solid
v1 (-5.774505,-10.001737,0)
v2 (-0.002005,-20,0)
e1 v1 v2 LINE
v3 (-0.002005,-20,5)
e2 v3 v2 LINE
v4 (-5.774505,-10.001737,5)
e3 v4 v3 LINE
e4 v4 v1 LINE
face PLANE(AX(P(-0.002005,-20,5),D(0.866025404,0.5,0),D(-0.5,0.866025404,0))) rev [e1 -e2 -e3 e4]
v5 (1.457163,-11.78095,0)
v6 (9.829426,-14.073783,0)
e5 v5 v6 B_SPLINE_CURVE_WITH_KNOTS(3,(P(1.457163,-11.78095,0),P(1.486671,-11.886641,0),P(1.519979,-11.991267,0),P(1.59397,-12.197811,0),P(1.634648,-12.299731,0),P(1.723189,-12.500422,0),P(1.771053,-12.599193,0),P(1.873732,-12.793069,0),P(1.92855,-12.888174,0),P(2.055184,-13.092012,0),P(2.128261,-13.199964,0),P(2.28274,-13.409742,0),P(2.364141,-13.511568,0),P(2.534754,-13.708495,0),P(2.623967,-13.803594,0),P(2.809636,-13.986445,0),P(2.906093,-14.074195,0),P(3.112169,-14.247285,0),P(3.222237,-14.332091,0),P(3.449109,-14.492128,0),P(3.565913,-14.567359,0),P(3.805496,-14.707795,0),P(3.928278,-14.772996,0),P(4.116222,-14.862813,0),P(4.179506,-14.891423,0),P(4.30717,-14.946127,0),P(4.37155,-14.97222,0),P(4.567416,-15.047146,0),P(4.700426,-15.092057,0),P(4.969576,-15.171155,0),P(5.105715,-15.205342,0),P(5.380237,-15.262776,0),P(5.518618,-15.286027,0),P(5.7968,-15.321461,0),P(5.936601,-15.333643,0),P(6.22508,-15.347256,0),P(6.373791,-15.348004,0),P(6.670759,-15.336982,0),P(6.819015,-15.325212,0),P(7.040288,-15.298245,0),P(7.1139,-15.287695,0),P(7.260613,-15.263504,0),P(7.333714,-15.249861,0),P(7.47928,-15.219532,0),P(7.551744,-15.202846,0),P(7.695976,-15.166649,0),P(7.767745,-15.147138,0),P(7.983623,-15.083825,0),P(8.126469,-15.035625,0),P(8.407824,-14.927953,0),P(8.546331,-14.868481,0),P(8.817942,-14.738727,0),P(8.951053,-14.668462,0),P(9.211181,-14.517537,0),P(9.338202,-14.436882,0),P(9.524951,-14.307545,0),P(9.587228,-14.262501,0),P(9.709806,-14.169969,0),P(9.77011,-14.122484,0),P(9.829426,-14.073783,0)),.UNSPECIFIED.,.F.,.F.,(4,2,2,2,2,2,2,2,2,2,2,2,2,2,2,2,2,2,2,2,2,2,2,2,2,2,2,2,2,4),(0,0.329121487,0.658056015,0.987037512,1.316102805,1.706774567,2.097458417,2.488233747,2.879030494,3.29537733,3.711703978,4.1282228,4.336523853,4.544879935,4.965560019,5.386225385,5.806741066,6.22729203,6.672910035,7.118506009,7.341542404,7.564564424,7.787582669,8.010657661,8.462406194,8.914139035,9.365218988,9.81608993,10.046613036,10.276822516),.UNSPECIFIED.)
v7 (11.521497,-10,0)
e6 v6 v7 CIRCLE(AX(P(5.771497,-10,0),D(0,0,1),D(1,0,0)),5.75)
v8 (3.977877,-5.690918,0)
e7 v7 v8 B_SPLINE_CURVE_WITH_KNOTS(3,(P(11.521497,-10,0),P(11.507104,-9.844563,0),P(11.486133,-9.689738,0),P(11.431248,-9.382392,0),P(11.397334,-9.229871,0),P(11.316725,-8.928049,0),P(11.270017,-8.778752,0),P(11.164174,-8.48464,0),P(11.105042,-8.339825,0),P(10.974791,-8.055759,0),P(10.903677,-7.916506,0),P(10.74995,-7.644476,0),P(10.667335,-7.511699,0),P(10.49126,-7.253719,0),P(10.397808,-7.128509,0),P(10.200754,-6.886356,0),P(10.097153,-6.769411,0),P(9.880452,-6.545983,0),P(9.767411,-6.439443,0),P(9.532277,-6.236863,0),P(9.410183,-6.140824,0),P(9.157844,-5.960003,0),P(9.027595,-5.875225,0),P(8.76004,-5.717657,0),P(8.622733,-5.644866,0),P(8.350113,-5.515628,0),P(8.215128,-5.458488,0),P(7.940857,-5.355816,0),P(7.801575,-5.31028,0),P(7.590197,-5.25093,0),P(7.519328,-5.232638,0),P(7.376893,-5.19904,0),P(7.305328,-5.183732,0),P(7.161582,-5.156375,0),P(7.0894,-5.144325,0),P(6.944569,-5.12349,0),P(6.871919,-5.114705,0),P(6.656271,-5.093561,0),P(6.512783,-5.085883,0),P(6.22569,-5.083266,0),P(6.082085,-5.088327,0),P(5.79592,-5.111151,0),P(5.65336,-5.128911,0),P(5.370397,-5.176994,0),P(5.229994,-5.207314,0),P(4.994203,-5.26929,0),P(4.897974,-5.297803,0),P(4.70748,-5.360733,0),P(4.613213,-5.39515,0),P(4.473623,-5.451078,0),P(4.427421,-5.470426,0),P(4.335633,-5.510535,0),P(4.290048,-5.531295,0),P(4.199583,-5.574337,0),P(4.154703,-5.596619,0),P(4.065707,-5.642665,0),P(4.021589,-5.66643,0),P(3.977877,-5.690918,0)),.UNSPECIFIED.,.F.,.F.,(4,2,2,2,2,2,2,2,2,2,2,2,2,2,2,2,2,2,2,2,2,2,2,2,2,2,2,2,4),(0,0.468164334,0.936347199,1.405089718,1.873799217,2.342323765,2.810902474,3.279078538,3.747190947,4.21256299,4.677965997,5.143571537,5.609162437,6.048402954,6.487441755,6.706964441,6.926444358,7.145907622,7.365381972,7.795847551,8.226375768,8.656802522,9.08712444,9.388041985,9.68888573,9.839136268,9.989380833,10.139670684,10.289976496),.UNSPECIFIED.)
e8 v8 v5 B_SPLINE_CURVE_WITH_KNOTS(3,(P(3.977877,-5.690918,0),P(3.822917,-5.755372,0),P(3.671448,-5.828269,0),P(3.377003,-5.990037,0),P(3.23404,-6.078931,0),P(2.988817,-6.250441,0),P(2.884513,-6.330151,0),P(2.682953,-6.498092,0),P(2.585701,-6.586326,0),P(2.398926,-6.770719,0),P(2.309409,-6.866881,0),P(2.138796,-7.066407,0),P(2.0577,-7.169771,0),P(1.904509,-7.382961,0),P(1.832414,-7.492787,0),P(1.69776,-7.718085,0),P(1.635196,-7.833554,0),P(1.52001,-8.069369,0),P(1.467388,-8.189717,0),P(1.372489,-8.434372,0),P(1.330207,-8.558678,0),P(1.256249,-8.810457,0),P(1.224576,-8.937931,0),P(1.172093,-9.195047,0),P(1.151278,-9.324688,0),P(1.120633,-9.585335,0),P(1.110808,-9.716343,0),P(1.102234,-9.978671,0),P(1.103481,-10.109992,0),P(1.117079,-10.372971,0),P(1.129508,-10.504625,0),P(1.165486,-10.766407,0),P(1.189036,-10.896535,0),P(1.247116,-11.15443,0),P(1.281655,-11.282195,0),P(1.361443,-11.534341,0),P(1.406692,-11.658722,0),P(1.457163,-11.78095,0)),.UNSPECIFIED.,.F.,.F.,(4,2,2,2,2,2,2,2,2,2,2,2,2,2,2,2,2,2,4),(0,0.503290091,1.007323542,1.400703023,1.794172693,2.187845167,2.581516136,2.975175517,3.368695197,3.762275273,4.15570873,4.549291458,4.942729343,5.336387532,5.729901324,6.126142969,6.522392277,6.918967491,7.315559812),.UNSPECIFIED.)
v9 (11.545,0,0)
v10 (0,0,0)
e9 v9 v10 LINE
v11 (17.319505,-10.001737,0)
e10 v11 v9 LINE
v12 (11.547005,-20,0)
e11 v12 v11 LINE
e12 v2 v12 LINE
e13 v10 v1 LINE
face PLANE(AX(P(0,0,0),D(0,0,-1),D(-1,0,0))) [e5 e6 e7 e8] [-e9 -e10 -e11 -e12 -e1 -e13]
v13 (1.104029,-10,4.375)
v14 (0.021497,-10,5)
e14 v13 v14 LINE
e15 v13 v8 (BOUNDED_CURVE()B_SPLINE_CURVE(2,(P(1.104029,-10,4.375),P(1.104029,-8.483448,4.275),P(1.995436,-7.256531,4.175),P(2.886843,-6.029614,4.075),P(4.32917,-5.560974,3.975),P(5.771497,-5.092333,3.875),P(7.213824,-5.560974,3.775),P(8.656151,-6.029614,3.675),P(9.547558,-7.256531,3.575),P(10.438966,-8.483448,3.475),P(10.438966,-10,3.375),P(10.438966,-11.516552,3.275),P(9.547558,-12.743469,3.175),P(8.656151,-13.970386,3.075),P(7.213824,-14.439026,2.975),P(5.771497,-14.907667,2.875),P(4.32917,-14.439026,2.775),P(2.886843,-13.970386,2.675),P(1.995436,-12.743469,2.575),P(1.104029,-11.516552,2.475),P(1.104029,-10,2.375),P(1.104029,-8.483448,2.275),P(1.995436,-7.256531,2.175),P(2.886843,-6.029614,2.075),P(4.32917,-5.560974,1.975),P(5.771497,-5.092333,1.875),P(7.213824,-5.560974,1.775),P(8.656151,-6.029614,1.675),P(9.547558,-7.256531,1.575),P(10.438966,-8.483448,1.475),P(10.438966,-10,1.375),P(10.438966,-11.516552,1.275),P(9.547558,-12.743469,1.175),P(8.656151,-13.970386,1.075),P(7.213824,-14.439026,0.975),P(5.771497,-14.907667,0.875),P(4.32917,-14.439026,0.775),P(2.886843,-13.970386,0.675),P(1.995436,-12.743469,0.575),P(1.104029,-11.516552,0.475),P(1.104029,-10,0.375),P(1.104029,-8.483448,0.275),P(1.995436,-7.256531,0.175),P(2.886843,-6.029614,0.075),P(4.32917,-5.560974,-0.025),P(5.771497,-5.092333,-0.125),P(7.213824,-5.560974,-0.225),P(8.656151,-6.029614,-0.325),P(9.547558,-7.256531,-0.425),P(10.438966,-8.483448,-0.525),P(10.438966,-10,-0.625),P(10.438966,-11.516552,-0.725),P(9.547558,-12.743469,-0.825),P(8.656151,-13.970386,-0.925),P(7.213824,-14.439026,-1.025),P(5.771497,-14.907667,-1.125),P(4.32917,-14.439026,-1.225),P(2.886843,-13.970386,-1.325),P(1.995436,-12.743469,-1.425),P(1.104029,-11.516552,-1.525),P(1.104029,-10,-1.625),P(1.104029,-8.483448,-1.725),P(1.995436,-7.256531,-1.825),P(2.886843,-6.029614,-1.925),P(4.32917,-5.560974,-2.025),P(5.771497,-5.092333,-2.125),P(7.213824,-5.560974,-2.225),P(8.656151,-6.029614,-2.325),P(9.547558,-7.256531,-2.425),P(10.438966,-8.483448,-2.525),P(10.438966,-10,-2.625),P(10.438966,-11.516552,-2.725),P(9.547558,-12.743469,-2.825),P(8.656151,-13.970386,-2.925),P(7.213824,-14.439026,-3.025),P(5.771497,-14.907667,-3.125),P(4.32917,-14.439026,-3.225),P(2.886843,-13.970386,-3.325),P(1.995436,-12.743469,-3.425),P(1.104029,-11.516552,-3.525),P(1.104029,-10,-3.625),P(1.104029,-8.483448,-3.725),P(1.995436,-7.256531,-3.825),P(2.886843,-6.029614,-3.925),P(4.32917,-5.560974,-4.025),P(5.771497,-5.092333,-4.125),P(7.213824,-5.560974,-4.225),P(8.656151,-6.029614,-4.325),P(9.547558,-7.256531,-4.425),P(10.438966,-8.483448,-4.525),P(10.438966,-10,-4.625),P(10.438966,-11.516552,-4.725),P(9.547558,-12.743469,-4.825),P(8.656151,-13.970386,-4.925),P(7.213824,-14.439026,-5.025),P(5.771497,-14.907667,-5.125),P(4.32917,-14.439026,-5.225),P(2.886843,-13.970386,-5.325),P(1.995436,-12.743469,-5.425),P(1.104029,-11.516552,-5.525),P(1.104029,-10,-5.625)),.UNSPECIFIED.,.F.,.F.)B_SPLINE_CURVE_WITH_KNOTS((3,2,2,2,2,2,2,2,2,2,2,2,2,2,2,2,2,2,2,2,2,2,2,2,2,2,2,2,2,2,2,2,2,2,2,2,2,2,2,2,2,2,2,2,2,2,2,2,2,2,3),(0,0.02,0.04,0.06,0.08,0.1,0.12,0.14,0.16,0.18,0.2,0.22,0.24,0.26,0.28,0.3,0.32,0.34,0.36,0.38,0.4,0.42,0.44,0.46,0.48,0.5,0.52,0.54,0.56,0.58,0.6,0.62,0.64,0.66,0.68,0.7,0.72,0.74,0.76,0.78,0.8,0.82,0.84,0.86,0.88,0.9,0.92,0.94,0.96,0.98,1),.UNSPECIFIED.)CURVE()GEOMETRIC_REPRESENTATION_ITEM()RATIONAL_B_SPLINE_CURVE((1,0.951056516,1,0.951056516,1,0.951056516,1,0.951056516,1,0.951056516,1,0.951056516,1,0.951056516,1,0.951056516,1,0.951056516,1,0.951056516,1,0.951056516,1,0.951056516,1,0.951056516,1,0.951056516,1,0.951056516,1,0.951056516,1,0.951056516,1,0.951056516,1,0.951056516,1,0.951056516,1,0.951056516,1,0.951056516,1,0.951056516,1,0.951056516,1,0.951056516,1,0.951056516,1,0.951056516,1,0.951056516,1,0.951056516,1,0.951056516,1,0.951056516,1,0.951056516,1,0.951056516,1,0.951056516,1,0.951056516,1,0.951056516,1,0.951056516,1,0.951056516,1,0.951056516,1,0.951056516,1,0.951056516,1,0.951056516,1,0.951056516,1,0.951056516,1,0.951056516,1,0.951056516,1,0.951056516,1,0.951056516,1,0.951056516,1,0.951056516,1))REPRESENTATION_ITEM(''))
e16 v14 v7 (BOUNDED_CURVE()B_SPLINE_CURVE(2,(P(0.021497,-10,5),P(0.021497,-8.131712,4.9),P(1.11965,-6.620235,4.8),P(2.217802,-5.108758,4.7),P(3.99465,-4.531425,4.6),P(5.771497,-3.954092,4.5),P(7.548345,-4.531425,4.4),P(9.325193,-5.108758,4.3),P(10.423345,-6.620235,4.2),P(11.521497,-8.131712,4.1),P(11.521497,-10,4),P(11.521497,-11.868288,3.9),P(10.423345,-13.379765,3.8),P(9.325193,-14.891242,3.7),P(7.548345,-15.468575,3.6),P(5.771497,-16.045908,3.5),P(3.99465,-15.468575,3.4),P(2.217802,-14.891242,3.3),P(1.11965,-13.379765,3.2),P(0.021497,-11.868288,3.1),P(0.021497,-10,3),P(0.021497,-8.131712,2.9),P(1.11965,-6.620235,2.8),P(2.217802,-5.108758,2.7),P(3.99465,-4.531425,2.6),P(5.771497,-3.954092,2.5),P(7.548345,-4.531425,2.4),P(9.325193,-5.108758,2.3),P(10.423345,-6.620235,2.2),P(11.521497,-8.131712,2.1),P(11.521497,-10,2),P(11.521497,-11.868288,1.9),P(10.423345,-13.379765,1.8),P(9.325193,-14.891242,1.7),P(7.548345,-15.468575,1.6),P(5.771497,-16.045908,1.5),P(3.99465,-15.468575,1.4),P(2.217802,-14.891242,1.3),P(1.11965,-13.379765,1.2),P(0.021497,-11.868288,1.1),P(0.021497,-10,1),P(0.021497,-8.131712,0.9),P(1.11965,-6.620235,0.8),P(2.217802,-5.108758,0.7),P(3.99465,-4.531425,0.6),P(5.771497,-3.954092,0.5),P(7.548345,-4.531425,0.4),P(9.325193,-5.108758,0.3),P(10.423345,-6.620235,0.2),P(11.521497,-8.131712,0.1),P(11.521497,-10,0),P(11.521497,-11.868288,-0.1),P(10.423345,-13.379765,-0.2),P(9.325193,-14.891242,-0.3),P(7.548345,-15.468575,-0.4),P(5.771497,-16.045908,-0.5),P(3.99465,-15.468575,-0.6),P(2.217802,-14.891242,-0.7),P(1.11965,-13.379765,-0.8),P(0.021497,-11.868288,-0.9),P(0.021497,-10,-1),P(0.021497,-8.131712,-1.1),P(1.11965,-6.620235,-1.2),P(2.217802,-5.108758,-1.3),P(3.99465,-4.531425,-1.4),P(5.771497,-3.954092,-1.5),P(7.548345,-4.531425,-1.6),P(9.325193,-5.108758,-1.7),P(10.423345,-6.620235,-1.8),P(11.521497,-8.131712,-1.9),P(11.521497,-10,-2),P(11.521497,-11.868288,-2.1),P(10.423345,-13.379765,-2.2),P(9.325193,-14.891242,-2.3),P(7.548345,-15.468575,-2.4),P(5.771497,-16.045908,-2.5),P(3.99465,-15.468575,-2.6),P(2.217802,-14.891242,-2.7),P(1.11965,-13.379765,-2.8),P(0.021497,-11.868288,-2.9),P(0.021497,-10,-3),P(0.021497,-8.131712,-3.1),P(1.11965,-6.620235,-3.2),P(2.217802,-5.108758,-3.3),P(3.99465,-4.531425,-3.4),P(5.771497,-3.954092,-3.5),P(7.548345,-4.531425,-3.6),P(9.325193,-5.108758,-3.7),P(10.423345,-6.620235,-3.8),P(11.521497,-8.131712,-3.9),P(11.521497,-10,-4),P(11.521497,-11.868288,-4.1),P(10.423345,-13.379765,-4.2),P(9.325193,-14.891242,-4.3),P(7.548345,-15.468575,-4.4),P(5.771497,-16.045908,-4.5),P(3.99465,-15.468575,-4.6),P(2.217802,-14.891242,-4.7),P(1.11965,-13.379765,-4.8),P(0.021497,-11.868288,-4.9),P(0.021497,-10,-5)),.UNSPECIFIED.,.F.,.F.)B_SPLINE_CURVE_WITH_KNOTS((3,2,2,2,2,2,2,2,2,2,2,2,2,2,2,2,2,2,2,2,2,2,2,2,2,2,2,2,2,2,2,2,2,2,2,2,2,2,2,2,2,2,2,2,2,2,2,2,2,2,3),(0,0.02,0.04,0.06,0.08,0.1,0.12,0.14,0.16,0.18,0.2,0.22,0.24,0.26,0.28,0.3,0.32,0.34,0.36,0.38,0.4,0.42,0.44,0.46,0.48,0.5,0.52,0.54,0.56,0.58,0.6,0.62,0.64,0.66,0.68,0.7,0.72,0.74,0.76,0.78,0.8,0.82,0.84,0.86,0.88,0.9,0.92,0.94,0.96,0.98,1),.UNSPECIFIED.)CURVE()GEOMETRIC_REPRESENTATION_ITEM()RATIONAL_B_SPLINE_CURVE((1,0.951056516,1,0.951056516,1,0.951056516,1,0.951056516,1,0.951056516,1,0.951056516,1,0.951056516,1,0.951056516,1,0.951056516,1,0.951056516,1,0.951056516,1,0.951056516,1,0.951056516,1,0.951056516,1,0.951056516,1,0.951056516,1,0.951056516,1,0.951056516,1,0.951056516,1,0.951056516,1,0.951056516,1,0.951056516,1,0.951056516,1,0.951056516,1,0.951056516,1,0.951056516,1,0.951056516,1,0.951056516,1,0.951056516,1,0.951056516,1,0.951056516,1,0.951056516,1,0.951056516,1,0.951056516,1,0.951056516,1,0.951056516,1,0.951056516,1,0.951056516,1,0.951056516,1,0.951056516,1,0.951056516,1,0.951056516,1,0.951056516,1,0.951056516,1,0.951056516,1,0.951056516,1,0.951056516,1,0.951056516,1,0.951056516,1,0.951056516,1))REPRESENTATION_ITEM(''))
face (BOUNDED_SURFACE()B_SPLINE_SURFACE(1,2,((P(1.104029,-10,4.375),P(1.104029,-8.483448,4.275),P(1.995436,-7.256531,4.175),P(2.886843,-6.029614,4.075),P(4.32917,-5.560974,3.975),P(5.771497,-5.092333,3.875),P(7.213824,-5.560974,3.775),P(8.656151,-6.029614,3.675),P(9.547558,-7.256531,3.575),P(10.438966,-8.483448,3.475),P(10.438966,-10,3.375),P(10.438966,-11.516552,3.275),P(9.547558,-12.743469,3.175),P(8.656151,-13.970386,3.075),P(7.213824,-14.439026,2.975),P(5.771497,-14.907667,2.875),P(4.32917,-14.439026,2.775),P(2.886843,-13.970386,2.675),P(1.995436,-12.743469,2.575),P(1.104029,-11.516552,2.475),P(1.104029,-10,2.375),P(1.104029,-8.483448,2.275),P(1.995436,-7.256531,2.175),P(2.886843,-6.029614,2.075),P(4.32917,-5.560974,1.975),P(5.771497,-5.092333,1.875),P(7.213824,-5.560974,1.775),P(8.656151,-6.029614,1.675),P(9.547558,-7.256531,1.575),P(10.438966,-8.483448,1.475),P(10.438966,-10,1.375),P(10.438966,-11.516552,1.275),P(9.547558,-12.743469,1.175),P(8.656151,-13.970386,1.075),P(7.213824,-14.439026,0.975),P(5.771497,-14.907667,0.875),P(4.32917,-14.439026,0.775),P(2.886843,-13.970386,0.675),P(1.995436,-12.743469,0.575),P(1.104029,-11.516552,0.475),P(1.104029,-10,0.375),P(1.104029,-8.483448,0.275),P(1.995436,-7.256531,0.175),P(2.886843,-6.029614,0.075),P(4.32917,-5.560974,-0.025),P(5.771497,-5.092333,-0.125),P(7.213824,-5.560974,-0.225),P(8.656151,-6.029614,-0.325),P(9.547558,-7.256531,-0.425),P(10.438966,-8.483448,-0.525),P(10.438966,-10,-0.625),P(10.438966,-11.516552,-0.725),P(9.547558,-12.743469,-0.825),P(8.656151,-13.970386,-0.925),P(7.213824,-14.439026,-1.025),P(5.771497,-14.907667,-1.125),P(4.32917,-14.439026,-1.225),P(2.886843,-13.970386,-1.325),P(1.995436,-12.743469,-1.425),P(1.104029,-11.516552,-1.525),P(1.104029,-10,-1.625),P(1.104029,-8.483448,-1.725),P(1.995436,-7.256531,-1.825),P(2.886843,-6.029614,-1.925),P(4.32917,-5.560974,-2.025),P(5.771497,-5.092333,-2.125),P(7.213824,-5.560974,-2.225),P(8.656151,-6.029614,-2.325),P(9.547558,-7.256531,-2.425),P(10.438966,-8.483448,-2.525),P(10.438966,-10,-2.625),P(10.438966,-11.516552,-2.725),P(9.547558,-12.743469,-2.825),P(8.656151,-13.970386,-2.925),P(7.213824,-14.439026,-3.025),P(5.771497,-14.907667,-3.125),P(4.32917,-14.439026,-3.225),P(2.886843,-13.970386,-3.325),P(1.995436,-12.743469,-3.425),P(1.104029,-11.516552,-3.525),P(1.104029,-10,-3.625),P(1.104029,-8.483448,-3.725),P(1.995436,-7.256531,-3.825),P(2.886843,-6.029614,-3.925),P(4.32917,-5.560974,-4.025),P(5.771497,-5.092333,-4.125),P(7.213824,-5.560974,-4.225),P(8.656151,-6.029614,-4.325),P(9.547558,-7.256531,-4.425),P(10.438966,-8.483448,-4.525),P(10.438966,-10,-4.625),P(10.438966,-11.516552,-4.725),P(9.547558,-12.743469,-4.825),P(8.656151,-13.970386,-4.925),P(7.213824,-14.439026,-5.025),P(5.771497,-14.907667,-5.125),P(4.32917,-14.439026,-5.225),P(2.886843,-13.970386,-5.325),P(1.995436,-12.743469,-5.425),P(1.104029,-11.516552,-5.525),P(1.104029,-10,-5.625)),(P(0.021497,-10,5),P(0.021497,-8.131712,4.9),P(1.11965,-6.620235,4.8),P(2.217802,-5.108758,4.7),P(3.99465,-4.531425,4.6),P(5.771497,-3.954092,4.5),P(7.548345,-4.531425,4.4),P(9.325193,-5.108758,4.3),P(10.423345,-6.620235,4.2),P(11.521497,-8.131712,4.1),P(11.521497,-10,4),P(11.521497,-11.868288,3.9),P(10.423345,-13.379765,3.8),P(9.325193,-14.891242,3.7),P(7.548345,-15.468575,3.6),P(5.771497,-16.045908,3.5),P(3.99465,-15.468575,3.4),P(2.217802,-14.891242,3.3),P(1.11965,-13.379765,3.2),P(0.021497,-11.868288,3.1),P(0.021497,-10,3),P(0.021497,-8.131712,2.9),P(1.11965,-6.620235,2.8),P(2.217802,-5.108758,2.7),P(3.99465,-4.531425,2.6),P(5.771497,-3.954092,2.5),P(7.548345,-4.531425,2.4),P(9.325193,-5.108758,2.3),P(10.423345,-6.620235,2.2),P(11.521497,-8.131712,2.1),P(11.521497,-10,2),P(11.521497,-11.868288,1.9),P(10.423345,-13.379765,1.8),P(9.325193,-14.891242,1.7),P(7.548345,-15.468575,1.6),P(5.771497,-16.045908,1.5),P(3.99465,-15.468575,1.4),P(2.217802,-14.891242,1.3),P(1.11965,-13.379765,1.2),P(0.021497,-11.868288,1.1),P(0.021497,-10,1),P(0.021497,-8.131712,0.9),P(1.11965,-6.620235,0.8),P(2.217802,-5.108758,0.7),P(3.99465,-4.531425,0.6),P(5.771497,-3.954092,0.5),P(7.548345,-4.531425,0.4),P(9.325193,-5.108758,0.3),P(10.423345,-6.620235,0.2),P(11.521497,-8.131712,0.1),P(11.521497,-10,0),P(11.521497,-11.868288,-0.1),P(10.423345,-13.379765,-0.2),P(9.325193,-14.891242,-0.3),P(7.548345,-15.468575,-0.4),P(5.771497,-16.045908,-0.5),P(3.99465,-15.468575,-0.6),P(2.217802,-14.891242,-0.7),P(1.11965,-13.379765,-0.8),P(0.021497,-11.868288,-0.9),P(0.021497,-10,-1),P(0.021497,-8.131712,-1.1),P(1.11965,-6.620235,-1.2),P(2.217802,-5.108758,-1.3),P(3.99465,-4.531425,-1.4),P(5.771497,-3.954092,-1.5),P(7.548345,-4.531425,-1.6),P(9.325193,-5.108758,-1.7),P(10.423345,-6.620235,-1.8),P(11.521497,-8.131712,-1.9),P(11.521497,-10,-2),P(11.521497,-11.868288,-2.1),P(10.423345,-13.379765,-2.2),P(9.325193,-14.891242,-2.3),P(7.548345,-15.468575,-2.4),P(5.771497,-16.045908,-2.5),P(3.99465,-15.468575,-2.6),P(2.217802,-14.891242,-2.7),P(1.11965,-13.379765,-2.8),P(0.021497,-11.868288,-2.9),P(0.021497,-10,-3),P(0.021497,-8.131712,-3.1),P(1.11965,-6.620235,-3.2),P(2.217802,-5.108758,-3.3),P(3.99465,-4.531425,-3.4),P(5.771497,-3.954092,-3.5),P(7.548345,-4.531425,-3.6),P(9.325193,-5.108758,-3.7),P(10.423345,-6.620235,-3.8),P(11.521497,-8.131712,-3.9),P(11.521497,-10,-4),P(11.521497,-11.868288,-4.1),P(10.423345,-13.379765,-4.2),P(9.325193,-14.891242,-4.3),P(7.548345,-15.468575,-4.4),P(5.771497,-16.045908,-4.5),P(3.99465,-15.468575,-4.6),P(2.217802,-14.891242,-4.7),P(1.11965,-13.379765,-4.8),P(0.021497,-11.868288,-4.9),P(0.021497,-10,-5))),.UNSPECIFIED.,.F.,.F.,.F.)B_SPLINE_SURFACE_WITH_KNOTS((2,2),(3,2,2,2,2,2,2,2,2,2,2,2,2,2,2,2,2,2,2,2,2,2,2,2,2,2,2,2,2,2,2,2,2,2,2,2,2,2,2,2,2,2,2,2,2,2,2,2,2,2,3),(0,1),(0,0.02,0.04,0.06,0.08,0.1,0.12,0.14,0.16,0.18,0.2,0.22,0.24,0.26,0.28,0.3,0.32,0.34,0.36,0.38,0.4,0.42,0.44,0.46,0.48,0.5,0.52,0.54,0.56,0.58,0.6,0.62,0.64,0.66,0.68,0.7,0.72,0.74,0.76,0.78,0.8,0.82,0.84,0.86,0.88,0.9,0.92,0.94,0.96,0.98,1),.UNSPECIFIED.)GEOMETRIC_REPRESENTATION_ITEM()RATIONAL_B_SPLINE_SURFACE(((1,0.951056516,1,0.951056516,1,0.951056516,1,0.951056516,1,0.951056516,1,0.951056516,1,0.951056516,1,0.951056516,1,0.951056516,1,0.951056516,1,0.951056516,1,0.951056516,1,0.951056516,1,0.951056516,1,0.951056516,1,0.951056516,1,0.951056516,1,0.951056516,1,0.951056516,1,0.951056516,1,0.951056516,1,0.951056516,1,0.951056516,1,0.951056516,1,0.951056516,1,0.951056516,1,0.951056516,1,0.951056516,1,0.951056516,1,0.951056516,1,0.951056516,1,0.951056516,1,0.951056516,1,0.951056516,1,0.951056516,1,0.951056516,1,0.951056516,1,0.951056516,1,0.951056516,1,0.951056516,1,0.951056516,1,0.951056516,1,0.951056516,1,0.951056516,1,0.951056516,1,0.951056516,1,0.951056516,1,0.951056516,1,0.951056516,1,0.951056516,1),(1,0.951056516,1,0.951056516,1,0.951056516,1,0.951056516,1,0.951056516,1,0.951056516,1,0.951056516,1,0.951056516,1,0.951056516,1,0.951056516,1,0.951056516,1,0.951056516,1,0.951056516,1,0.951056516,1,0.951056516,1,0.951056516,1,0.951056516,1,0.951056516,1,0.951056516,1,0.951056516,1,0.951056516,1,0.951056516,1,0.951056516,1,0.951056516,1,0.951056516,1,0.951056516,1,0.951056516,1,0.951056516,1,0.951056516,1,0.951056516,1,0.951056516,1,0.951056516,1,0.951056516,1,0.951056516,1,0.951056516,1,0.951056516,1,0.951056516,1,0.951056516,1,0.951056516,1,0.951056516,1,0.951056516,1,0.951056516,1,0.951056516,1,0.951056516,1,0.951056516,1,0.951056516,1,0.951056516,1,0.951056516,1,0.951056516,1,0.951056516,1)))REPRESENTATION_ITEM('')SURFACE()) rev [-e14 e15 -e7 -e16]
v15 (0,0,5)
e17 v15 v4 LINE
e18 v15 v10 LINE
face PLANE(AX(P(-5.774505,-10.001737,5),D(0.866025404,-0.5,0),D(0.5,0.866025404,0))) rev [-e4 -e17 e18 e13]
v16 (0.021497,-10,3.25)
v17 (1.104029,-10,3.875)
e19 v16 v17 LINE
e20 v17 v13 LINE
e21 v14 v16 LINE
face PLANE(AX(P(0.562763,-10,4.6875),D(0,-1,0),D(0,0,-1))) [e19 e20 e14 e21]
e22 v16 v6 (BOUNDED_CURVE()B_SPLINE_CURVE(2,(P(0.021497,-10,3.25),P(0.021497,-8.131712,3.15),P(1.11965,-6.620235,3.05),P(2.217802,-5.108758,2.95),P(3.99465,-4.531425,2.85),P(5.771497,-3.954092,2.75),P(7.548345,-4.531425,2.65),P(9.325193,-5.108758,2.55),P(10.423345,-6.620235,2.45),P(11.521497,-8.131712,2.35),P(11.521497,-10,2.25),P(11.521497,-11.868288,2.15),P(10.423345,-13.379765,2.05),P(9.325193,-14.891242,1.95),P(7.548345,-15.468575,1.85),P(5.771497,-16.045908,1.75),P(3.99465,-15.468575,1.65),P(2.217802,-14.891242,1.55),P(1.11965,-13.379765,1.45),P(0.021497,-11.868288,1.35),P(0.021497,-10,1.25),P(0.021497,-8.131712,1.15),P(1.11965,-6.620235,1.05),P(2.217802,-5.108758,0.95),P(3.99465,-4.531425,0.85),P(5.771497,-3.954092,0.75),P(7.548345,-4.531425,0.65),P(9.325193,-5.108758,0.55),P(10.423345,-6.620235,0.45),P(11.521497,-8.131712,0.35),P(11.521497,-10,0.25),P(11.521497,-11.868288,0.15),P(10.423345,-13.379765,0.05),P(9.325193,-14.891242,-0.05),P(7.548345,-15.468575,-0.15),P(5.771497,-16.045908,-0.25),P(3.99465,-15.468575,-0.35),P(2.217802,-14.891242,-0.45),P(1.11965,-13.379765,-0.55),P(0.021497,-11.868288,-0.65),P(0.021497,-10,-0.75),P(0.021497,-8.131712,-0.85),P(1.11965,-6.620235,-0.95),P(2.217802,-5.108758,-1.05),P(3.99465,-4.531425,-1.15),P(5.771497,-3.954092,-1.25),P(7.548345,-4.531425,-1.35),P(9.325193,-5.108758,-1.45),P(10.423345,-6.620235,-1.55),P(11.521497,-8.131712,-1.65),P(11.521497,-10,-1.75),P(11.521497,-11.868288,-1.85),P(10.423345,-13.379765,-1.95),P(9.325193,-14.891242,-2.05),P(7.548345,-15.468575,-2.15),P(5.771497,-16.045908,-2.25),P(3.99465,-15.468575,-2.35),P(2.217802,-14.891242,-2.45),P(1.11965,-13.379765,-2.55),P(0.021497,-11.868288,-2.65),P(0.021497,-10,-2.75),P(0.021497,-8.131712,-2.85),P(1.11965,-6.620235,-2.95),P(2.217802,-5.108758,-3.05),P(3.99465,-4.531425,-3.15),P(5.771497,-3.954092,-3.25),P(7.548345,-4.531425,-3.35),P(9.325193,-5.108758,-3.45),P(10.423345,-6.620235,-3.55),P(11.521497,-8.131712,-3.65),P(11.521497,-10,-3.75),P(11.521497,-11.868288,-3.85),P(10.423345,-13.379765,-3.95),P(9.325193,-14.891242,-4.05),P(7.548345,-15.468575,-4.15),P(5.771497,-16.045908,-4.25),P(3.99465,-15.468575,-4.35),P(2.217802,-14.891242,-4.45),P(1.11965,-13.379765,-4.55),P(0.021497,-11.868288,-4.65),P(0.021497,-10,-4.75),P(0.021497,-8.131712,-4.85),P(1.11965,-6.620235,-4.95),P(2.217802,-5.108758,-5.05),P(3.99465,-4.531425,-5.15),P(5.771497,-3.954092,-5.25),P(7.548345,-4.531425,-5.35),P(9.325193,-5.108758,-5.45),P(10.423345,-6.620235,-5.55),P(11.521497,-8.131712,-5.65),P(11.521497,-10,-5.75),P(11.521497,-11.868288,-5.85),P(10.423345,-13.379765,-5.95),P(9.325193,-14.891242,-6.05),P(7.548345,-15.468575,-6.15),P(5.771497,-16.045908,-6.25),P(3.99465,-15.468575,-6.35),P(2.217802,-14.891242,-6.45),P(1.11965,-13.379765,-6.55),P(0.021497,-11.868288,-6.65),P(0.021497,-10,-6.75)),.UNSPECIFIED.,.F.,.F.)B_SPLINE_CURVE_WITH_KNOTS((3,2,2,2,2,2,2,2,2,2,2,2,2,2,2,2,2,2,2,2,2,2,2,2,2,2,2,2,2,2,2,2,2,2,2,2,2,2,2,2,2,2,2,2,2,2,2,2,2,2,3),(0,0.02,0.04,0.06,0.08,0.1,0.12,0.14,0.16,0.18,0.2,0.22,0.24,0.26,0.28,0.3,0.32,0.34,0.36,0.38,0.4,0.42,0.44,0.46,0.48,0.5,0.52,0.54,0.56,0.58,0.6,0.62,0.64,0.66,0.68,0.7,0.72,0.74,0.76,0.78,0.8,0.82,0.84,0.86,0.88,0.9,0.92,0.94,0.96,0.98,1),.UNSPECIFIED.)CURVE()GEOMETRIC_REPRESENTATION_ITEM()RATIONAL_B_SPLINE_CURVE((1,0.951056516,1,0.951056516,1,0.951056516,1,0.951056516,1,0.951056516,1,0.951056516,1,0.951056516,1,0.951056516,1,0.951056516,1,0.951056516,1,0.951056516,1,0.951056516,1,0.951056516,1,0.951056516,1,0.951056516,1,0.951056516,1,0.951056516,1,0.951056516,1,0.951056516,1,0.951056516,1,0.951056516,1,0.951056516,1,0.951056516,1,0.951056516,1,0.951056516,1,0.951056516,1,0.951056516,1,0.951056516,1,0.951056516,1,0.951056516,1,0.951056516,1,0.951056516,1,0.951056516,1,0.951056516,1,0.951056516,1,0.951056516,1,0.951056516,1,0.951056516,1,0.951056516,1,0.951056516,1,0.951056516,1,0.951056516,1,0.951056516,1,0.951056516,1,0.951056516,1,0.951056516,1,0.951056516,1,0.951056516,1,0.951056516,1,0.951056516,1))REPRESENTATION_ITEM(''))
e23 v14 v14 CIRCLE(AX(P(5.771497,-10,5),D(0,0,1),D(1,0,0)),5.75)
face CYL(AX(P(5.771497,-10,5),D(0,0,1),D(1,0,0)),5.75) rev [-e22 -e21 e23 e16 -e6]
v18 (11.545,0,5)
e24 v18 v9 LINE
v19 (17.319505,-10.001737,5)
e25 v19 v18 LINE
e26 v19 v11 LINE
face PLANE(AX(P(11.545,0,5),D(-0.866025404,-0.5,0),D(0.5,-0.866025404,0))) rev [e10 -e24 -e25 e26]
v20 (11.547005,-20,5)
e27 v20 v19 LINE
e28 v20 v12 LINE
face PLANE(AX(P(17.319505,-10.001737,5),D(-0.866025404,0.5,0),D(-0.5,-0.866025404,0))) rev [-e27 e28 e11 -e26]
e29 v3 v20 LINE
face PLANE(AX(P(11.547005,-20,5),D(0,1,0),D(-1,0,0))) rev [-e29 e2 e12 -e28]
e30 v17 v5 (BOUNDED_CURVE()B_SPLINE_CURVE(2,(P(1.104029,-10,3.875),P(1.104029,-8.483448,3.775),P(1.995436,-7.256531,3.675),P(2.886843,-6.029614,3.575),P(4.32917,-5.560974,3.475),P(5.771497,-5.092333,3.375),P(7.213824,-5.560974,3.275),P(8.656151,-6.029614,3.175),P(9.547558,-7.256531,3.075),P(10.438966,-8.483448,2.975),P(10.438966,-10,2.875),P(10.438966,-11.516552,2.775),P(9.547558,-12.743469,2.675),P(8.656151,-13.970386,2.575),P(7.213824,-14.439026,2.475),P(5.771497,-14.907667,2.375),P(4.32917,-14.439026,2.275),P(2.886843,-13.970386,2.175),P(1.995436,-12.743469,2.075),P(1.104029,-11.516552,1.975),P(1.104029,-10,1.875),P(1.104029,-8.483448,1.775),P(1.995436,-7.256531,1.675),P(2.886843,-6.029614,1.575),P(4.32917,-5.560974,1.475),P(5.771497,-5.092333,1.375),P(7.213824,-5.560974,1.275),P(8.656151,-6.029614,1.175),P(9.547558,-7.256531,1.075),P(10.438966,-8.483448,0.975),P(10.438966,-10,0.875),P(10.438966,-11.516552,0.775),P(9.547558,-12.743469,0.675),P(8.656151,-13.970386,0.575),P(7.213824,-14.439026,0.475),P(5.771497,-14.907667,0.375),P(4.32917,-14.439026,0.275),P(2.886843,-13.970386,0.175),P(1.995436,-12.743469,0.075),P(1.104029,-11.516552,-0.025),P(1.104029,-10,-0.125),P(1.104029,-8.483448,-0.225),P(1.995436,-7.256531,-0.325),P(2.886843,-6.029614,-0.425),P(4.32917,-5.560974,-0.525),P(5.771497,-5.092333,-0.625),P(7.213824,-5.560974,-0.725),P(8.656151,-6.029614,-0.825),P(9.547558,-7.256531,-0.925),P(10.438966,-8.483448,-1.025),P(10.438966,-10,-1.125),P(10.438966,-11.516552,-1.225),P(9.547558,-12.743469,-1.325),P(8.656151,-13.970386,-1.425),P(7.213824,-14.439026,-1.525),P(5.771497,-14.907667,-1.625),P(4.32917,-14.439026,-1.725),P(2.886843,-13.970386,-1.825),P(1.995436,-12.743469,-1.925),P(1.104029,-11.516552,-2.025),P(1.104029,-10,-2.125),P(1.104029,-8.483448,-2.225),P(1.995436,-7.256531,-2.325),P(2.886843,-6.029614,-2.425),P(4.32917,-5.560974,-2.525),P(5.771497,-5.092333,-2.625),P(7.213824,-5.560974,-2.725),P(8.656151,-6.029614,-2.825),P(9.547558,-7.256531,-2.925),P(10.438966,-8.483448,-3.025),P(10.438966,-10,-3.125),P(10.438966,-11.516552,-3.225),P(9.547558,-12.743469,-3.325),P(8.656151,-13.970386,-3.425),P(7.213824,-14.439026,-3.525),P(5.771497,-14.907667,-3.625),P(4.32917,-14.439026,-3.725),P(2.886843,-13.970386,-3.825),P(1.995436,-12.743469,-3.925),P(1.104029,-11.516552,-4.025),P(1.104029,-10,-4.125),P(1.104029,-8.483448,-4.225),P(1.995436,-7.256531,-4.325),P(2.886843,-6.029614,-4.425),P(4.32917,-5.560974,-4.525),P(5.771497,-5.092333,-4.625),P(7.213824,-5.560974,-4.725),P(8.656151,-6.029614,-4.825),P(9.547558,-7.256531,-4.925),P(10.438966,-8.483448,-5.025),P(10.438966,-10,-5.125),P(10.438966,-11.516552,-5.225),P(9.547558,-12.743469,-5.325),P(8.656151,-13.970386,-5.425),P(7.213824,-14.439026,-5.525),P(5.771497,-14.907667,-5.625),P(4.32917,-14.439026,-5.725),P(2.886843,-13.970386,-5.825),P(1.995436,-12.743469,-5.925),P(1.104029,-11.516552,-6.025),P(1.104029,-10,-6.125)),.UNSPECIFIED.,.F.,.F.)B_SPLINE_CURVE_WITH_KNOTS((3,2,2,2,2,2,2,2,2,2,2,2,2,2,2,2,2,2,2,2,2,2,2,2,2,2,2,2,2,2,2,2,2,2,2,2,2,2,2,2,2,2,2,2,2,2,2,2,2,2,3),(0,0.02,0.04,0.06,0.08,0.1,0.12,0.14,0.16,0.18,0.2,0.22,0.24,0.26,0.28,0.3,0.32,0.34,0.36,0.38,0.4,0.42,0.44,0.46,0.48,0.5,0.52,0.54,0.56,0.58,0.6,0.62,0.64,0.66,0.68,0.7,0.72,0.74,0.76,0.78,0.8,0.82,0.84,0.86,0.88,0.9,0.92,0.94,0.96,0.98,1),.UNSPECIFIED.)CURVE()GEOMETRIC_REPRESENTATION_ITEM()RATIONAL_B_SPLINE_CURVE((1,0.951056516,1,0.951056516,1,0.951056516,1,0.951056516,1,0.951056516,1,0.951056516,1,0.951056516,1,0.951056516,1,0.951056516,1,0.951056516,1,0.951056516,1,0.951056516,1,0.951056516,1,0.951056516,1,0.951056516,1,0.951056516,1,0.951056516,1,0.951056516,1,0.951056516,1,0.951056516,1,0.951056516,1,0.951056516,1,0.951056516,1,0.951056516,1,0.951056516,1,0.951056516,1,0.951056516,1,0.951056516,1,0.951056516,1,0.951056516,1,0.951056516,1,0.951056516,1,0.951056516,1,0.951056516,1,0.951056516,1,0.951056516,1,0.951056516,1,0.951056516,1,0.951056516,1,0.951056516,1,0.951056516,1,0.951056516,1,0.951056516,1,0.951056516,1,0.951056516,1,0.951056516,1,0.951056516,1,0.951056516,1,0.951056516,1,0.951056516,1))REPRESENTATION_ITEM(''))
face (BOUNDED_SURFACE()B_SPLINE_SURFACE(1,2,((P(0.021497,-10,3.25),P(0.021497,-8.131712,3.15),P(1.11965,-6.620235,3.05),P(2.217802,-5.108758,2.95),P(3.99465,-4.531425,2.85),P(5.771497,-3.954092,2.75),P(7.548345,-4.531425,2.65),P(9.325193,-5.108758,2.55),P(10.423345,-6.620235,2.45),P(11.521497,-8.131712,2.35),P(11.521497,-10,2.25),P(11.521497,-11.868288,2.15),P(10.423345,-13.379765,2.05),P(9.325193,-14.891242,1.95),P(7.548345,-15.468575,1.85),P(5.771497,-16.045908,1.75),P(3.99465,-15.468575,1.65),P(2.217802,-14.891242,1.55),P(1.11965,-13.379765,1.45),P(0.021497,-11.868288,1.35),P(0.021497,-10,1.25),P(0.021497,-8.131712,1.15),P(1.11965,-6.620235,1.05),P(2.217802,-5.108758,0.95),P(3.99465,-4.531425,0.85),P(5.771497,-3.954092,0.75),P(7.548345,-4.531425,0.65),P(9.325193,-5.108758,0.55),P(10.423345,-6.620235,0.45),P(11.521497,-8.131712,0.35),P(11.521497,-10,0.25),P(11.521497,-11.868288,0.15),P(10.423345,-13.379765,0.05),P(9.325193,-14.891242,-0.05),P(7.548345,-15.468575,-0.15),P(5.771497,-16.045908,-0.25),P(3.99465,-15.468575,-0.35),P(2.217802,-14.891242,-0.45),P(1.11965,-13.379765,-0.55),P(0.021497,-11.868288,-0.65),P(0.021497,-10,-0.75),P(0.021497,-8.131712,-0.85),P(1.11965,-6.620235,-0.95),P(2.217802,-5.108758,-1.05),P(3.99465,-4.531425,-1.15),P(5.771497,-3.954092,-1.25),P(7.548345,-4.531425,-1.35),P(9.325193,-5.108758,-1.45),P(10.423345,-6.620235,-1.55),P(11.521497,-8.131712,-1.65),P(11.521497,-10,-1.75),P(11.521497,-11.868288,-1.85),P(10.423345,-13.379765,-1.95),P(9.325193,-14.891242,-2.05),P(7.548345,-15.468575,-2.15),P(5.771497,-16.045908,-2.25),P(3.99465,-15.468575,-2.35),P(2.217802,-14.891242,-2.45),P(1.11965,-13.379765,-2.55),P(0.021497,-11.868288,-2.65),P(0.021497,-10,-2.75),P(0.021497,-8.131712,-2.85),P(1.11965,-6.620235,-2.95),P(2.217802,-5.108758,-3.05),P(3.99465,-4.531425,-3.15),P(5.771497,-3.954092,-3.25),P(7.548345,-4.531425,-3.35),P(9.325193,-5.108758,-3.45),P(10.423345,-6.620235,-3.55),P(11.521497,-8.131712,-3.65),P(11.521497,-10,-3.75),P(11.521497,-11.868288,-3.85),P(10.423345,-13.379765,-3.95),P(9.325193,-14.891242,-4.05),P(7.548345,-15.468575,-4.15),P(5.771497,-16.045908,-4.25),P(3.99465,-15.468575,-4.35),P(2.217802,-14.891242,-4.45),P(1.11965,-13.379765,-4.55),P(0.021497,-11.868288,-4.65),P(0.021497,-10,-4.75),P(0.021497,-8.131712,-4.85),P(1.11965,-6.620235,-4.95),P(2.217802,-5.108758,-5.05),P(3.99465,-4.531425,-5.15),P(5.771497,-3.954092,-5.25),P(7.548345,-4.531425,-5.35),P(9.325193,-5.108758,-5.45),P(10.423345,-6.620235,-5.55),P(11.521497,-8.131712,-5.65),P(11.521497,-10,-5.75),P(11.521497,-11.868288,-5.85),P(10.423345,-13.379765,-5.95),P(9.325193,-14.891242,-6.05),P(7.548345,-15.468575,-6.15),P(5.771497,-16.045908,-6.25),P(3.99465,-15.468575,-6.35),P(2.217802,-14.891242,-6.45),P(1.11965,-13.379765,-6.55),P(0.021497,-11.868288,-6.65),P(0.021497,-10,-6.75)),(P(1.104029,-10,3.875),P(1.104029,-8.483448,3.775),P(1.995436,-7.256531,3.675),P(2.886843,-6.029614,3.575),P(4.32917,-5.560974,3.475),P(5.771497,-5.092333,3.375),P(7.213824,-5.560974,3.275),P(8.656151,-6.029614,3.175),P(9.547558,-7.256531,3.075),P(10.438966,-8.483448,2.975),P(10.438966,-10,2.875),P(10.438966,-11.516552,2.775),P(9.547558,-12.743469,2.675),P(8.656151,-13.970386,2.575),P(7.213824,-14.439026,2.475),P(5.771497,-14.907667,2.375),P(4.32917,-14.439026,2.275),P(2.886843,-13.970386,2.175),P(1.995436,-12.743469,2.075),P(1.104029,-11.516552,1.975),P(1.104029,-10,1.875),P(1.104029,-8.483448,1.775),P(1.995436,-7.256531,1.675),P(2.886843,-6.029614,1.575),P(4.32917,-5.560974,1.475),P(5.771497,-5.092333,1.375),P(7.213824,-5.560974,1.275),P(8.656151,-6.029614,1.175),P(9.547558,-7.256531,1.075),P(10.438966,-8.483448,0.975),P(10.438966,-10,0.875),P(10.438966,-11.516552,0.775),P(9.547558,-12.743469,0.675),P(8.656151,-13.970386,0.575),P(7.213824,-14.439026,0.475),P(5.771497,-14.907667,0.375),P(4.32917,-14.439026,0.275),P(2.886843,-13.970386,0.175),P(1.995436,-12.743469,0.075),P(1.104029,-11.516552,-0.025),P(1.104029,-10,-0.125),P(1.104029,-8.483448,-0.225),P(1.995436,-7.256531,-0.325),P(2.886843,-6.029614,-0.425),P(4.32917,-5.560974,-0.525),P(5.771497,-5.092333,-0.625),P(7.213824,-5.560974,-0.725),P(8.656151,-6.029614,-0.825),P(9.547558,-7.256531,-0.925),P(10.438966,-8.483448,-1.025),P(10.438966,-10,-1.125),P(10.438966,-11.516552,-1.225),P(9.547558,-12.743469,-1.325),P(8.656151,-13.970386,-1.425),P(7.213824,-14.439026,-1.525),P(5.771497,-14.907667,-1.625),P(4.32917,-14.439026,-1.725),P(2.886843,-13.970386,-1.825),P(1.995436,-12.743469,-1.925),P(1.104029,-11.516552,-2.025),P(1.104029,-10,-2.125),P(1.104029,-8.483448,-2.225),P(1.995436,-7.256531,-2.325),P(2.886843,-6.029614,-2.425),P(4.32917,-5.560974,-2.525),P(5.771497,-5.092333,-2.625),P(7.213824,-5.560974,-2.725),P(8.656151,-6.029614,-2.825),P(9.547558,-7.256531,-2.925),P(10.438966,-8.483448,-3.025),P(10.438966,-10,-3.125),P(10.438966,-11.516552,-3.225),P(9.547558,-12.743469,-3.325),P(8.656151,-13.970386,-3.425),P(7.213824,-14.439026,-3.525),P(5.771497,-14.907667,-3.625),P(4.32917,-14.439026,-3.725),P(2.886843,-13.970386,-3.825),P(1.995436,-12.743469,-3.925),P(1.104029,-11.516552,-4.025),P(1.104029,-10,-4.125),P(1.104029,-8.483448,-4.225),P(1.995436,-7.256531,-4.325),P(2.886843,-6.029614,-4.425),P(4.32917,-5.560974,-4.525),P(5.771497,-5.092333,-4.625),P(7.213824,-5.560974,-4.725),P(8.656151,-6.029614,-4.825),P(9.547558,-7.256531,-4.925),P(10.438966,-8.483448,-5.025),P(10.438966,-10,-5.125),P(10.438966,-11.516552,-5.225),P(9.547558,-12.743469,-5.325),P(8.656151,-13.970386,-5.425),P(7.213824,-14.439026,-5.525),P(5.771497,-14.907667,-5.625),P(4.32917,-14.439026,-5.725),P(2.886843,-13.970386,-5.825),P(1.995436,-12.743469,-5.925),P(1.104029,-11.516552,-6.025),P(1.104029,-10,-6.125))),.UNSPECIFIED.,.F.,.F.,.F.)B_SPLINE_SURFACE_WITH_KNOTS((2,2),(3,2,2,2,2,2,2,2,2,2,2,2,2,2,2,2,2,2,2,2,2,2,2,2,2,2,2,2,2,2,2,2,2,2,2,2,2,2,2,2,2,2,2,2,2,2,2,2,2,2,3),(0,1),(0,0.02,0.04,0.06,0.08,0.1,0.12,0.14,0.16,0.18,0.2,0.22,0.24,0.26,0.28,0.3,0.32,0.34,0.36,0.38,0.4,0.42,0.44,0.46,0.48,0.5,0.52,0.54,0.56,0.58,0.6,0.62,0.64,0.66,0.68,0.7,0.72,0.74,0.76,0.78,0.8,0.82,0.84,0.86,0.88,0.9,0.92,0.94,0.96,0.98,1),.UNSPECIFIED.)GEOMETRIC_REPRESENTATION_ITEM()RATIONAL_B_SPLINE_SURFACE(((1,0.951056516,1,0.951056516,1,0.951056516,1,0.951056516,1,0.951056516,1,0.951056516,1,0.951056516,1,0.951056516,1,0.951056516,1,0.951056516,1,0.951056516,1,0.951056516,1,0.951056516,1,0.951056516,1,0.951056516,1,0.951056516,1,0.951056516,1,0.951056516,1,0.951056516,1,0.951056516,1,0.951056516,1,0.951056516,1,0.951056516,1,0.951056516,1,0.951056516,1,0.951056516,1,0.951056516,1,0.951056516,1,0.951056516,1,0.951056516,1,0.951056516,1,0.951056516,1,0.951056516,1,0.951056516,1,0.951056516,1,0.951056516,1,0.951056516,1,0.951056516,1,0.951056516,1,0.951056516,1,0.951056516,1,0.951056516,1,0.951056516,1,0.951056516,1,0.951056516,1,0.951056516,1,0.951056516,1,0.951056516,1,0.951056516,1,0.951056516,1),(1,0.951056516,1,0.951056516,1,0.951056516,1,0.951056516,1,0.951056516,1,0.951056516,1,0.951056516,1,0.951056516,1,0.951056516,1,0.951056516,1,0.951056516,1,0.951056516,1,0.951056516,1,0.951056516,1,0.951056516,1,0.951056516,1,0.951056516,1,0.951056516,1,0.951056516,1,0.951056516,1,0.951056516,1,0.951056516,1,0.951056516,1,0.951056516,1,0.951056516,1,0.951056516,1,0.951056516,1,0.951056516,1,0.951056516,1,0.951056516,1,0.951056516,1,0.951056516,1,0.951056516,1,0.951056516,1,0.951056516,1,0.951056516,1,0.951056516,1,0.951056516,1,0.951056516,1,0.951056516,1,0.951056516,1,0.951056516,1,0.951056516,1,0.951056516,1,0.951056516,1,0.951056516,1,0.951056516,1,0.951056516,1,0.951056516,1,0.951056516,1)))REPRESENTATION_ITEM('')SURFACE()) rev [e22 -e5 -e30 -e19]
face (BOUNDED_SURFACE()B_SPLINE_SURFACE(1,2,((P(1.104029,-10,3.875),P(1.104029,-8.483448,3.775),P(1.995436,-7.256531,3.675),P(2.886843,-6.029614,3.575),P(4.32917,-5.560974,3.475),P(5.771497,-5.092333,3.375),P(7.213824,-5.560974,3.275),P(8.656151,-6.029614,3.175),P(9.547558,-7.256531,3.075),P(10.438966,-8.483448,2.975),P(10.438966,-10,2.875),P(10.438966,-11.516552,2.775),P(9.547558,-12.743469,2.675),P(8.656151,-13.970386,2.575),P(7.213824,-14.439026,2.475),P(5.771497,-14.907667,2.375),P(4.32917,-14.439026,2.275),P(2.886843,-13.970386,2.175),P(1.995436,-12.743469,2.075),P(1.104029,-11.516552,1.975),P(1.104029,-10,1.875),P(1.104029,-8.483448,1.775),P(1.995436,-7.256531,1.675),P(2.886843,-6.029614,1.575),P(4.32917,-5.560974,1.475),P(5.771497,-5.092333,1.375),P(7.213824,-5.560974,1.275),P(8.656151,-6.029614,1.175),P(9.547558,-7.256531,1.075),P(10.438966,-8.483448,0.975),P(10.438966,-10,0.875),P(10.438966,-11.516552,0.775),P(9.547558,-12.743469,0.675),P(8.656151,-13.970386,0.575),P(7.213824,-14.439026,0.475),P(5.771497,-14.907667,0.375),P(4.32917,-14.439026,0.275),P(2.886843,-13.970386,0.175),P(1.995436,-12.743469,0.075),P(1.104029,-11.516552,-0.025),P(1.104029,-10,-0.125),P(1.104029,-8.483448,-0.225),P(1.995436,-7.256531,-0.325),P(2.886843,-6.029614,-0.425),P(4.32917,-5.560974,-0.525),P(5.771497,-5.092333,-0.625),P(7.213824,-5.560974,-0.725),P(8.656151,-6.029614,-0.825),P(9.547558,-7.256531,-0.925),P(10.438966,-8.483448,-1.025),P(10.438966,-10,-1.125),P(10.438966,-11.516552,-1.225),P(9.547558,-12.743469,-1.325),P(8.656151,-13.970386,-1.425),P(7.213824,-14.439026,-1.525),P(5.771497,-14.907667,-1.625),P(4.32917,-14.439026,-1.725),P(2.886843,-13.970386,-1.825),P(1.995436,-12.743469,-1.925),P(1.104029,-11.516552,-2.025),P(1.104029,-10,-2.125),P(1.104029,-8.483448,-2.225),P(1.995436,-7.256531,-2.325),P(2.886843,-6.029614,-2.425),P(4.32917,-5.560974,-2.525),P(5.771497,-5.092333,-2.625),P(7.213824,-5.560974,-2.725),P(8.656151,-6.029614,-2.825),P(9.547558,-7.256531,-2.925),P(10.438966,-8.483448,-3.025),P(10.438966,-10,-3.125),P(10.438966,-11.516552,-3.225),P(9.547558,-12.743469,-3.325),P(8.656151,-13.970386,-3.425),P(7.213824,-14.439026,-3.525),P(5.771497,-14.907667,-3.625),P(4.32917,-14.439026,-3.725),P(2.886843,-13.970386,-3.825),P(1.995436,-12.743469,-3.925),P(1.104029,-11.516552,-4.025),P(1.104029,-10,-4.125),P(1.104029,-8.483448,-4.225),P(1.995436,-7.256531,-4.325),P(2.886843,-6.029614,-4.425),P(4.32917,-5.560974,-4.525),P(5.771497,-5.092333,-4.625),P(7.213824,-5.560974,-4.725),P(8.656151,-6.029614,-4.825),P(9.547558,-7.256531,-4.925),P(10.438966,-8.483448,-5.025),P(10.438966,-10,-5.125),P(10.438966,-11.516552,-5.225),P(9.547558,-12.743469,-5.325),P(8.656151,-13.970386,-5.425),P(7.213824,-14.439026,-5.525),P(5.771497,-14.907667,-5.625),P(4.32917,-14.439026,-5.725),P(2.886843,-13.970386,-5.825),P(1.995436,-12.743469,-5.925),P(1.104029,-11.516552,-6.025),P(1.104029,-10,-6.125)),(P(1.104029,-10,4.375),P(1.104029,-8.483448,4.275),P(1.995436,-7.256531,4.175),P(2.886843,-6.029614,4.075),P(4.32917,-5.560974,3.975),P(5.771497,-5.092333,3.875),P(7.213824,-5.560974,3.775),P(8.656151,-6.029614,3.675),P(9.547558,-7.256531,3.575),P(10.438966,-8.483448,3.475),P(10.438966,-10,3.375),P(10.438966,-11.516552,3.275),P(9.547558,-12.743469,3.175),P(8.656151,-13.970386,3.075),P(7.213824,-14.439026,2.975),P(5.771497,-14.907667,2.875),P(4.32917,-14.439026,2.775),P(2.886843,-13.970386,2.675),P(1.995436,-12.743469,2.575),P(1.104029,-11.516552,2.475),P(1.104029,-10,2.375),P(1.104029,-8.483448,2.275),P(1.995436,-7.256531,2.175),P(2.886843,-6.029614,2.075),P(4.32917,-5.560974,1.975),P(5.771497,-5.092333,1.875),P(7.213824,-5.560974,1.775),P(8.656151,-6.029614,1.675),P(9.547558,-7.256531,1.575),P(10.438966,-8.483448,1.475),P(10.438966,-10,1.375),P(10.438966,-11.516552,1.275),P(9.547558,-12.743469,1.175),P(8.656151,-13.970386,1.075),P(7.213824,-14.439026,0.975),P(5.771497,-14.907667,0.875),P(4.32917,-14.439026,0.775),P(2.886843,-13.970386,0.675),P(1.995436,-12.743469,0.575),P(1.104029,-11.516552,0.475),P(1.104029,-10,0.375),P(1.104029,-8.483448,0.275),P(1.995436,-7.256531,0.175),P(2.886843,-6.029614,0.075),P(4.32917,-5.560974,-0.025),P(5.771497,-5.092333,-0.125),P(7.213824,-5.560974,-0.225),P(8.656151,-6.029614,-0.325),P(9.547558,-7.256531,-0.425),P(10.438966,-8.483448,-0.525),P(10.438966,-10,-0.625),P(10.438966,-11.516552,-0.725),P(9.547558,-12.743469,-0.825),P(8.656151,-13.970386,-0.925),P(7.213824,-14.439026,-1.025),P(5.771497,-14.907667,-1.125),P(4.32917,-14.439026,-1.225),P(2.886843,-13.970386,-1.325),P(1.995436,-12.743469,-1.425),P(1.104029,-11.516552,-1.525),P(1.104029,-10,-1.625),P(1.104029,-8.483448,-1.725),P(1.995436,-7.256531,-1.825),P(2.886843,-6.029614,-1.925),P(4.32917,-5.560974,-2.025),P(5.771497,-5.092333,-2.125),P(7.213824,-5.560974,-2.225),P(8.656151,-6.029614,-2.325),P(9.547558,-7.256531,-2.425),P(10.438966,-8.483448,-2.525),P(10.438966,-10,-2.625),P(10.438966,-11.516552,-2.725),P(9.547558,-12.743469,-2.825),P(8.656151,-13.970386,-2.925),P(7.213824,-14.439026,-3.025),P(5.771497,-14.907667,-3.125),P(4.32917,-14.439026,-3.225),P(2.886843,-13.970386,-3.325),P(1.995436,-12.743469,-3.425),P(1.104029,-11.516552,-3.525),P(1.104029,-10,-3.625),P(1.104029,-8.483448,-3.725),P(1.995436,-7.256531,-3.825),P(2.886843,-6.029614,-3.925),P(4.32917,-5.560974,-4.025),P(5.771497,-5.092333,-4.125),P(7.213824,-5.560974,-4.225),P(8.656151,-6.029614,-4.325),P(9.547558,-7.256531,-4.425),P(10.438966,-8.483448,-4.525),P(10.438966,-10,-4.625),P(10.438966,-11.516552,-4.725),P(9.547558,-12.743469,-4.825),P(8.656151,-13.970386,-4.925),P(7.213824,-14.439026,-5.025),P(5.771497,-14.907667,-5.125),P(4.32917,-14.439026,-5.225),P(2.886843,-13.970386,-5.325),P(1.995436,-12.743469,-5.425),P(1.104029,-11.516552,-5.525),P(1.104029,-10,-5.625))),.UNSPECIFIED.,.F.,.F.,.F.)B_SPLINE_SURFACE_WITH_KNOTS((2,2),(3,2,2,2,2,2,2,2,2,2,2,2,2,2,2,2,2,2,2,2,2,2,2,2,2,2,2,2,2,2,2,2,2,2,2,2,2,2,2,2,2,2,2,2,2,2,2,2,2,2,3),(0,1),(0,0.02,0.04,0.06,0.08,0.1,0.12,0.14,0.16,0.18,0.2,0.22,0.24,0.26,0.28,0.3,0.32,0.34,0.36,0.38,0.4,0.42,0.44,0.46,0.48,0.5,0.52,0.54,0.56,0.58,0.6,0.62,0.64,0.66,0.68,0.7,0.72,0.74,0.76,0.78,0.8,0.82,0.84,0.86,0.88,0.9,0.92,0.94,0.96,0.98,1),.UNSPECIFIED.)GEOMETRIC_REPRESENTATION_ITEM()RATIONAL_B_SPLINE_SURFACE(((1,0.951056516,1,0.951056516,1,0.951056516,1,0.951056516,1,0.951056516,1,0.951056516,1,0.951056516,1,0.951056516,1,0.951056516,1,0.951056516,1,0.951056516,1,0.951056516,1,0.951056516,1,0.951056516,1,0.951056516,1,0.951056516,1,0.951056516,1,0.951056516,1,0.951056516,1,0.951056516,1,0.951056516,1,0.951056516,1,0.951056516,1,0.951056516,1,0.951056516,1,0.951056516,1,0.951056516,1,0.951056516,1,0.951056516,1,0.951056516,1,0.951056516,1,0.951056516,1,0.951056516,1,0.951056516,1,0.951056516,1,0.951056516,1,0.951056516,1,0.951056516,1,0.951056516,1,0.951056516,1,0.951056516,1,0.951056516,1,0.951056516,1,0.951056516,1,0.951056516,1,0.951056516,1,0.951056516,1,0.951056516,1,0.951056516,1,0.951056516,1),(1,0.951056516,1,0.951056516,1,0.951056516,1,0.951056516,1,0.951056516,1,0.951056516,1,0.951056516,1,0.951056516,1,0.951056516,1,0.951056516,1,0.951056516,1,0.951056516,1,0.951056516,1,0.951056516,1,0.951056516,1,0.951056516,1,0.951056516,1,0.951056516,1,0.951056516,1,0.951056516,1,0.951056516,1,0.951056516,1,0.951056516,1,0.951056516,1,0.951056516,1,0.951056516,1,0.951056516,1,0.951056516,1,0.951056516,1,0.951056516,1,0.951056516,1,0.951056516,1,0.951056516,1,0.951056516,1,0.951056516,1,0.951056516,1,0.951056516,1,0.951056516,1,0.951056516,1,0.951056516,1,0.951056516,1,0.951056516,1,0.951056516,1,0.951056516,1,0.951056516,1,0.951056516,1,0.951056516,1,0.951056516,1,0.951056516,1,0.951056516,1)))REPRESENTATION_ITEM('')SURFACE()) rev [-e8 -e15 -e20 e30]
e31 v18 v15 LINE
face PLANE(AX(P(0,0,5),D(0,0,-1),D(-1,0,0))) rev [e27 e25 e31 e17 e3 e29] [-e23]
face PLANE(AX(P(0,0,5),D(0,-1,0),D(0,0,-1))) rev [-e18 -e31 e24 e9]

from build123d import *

# Parameters (mm, degrees)
AUFSATZ_LINEAR_AUSTRAGEN1_DEPTH   = 5
GEWINDEBOHRUNG_F_R_PG7_F_HRUNG1_D = 11.5
GEWINDE1_PITCH                    = 2
SKIZZE12_W                        = 16.387995399
SKIZZE12_H                        = 16.357045455
SCHNITT_LINEAR_AUSTRAGEN1_DEPTH   = 10


with BuildPart() as part:
    # Skizze1 → Aufsatz-Linear austragen1 (new body)
    with BuildSketch(Plane.XY):
        Polygon((0, 0), (11.545, 0), (17.319505384, -10.001736713), (11.547005384, -20), (-0.002005384, -20), (-5.774505384, -10.001736713), align=None)
    extrude(amount=AUFSATZ_LINEAR_AUSTRAGEN1_DEPTH)

    # Gewindebohrung für Pg7 Führung1 (through all)
    with Locations(Plane(origin=(5.771497308, -10, 5), x_dir=(1, 0, 0), z_dir=(0, 0, 1))):
        with Locations((0, 0)):
            Hole(GEWINDEBOHRUNG_F_R_PG7_F_HRUNG1_D / 2)

    # Gewinde1: the profile of Gewindeprofil2 profile screwed along a right-hand helix of 5 turns, 10 arcs to a turn; built about Z, then put on its axis
    gewinde1_z = Axis((0, 0, 0), (0, 0, 1))
    gewinde1_corners = [(5.7503, 0, -0.000173205), (5.7503, 0, 1.7501732), (4.66746825, 0, 1.124999997), (4.66746825, 0, 0.624999997)]
    with BuildLine(mode=Mode.PRIVATE) as gewinde1_profile:
        Line(gewinde1_corners[0], gewinde1_corners[1])
        Line(gewinde1_corners[1], gewinde1_corners[2])
        Line(gewinde1_corners[2], gewinde1_corners[3])
        Line(gewinde1_corners[3], gewinde1_corners[0])
    gewinde1_cap = Face(gewinde1_profile.wire())
    gewinde1_turn_angles = [0, 18, 36, 54, 72, 90, 108, 126, 144, 162, 180, 198, 216, 234, 252, 270, 288, 306, 324, 342, 360]
    gewinde1_turn_weights = [1, 0.9510565162951535, 1, 0.9510565162951535, 1, 0.9510565162951535, 1, 0.9510565162951535, 1, 0.9510565162951535, 1, 0.9510565162951535, 1, 0.9510565162951535, 1, 0.9510565162951535, 1, 0.9510565162951535, 1, 0.9510565162951535, 1]
    gewinde1_turn_rails = [Edge.make_bspline([Vector(p[0], p[1], 0).rotate(gewinde1_z, gewinde1_turn_angles[k]) / gewinde1_turn_weights[k] + Vector(0, 0, p[2] + GEWINDE1_PITCH * gewinde1_turn_angles[k] / 360) for k in range(21)], [0, 0, 0, 1, 1, 2, 2, 3, 3, 4, 4, 5, 5, 6, 6, 7, 7, 8, 8, 9, 9, 10, 10, 10], 2, gewinde1_turn_weights) for p in gewinde1_corners]
    gewinde1_turn_sides = [Face.make_surface_from_curves(gewinde1_turn_rails[p[0]], gewinde1_turn_rails[p[1]]) for p in [(0, 1), (1, 2), (2, 3), (3, 0)]]
    gewinde1 = Plane(origin=(5.771497308, -10, 5), x_dir=(-1, 0, 0), z_dir=(0, 0, -1)) * Solid(Shell([*[p.moved(Location((0, 0, GEWINDE1_PITCH * i))) for i in range(5) for p in gewinde1_turn_sides], gewinde1_cap, gewinde1_cap.rotate(gewinde1_z, 1800).moved(Location((0, 0, GEWINDE1_PITCH * 1800 / 360)))]))
    add(gewinde1)

    # Skizze12 → Schnitt-Linear austragen1 (cut)
    with BuildSketch(Plane(origin=(0, 0, 0), x_dir=(-1, 0, 0), z_dir=(0, 0, -1))):
        with Locations((-5.65643771, -10.147012235)):
            Rectangle(SKIZZE12_W, SKIZZE12_H)
    extrude(amount=SCHNITT_LINEAR_AUSTRAGEN1_DEPTH, mode=Mode.SUBTRACT)


solid = part.part
